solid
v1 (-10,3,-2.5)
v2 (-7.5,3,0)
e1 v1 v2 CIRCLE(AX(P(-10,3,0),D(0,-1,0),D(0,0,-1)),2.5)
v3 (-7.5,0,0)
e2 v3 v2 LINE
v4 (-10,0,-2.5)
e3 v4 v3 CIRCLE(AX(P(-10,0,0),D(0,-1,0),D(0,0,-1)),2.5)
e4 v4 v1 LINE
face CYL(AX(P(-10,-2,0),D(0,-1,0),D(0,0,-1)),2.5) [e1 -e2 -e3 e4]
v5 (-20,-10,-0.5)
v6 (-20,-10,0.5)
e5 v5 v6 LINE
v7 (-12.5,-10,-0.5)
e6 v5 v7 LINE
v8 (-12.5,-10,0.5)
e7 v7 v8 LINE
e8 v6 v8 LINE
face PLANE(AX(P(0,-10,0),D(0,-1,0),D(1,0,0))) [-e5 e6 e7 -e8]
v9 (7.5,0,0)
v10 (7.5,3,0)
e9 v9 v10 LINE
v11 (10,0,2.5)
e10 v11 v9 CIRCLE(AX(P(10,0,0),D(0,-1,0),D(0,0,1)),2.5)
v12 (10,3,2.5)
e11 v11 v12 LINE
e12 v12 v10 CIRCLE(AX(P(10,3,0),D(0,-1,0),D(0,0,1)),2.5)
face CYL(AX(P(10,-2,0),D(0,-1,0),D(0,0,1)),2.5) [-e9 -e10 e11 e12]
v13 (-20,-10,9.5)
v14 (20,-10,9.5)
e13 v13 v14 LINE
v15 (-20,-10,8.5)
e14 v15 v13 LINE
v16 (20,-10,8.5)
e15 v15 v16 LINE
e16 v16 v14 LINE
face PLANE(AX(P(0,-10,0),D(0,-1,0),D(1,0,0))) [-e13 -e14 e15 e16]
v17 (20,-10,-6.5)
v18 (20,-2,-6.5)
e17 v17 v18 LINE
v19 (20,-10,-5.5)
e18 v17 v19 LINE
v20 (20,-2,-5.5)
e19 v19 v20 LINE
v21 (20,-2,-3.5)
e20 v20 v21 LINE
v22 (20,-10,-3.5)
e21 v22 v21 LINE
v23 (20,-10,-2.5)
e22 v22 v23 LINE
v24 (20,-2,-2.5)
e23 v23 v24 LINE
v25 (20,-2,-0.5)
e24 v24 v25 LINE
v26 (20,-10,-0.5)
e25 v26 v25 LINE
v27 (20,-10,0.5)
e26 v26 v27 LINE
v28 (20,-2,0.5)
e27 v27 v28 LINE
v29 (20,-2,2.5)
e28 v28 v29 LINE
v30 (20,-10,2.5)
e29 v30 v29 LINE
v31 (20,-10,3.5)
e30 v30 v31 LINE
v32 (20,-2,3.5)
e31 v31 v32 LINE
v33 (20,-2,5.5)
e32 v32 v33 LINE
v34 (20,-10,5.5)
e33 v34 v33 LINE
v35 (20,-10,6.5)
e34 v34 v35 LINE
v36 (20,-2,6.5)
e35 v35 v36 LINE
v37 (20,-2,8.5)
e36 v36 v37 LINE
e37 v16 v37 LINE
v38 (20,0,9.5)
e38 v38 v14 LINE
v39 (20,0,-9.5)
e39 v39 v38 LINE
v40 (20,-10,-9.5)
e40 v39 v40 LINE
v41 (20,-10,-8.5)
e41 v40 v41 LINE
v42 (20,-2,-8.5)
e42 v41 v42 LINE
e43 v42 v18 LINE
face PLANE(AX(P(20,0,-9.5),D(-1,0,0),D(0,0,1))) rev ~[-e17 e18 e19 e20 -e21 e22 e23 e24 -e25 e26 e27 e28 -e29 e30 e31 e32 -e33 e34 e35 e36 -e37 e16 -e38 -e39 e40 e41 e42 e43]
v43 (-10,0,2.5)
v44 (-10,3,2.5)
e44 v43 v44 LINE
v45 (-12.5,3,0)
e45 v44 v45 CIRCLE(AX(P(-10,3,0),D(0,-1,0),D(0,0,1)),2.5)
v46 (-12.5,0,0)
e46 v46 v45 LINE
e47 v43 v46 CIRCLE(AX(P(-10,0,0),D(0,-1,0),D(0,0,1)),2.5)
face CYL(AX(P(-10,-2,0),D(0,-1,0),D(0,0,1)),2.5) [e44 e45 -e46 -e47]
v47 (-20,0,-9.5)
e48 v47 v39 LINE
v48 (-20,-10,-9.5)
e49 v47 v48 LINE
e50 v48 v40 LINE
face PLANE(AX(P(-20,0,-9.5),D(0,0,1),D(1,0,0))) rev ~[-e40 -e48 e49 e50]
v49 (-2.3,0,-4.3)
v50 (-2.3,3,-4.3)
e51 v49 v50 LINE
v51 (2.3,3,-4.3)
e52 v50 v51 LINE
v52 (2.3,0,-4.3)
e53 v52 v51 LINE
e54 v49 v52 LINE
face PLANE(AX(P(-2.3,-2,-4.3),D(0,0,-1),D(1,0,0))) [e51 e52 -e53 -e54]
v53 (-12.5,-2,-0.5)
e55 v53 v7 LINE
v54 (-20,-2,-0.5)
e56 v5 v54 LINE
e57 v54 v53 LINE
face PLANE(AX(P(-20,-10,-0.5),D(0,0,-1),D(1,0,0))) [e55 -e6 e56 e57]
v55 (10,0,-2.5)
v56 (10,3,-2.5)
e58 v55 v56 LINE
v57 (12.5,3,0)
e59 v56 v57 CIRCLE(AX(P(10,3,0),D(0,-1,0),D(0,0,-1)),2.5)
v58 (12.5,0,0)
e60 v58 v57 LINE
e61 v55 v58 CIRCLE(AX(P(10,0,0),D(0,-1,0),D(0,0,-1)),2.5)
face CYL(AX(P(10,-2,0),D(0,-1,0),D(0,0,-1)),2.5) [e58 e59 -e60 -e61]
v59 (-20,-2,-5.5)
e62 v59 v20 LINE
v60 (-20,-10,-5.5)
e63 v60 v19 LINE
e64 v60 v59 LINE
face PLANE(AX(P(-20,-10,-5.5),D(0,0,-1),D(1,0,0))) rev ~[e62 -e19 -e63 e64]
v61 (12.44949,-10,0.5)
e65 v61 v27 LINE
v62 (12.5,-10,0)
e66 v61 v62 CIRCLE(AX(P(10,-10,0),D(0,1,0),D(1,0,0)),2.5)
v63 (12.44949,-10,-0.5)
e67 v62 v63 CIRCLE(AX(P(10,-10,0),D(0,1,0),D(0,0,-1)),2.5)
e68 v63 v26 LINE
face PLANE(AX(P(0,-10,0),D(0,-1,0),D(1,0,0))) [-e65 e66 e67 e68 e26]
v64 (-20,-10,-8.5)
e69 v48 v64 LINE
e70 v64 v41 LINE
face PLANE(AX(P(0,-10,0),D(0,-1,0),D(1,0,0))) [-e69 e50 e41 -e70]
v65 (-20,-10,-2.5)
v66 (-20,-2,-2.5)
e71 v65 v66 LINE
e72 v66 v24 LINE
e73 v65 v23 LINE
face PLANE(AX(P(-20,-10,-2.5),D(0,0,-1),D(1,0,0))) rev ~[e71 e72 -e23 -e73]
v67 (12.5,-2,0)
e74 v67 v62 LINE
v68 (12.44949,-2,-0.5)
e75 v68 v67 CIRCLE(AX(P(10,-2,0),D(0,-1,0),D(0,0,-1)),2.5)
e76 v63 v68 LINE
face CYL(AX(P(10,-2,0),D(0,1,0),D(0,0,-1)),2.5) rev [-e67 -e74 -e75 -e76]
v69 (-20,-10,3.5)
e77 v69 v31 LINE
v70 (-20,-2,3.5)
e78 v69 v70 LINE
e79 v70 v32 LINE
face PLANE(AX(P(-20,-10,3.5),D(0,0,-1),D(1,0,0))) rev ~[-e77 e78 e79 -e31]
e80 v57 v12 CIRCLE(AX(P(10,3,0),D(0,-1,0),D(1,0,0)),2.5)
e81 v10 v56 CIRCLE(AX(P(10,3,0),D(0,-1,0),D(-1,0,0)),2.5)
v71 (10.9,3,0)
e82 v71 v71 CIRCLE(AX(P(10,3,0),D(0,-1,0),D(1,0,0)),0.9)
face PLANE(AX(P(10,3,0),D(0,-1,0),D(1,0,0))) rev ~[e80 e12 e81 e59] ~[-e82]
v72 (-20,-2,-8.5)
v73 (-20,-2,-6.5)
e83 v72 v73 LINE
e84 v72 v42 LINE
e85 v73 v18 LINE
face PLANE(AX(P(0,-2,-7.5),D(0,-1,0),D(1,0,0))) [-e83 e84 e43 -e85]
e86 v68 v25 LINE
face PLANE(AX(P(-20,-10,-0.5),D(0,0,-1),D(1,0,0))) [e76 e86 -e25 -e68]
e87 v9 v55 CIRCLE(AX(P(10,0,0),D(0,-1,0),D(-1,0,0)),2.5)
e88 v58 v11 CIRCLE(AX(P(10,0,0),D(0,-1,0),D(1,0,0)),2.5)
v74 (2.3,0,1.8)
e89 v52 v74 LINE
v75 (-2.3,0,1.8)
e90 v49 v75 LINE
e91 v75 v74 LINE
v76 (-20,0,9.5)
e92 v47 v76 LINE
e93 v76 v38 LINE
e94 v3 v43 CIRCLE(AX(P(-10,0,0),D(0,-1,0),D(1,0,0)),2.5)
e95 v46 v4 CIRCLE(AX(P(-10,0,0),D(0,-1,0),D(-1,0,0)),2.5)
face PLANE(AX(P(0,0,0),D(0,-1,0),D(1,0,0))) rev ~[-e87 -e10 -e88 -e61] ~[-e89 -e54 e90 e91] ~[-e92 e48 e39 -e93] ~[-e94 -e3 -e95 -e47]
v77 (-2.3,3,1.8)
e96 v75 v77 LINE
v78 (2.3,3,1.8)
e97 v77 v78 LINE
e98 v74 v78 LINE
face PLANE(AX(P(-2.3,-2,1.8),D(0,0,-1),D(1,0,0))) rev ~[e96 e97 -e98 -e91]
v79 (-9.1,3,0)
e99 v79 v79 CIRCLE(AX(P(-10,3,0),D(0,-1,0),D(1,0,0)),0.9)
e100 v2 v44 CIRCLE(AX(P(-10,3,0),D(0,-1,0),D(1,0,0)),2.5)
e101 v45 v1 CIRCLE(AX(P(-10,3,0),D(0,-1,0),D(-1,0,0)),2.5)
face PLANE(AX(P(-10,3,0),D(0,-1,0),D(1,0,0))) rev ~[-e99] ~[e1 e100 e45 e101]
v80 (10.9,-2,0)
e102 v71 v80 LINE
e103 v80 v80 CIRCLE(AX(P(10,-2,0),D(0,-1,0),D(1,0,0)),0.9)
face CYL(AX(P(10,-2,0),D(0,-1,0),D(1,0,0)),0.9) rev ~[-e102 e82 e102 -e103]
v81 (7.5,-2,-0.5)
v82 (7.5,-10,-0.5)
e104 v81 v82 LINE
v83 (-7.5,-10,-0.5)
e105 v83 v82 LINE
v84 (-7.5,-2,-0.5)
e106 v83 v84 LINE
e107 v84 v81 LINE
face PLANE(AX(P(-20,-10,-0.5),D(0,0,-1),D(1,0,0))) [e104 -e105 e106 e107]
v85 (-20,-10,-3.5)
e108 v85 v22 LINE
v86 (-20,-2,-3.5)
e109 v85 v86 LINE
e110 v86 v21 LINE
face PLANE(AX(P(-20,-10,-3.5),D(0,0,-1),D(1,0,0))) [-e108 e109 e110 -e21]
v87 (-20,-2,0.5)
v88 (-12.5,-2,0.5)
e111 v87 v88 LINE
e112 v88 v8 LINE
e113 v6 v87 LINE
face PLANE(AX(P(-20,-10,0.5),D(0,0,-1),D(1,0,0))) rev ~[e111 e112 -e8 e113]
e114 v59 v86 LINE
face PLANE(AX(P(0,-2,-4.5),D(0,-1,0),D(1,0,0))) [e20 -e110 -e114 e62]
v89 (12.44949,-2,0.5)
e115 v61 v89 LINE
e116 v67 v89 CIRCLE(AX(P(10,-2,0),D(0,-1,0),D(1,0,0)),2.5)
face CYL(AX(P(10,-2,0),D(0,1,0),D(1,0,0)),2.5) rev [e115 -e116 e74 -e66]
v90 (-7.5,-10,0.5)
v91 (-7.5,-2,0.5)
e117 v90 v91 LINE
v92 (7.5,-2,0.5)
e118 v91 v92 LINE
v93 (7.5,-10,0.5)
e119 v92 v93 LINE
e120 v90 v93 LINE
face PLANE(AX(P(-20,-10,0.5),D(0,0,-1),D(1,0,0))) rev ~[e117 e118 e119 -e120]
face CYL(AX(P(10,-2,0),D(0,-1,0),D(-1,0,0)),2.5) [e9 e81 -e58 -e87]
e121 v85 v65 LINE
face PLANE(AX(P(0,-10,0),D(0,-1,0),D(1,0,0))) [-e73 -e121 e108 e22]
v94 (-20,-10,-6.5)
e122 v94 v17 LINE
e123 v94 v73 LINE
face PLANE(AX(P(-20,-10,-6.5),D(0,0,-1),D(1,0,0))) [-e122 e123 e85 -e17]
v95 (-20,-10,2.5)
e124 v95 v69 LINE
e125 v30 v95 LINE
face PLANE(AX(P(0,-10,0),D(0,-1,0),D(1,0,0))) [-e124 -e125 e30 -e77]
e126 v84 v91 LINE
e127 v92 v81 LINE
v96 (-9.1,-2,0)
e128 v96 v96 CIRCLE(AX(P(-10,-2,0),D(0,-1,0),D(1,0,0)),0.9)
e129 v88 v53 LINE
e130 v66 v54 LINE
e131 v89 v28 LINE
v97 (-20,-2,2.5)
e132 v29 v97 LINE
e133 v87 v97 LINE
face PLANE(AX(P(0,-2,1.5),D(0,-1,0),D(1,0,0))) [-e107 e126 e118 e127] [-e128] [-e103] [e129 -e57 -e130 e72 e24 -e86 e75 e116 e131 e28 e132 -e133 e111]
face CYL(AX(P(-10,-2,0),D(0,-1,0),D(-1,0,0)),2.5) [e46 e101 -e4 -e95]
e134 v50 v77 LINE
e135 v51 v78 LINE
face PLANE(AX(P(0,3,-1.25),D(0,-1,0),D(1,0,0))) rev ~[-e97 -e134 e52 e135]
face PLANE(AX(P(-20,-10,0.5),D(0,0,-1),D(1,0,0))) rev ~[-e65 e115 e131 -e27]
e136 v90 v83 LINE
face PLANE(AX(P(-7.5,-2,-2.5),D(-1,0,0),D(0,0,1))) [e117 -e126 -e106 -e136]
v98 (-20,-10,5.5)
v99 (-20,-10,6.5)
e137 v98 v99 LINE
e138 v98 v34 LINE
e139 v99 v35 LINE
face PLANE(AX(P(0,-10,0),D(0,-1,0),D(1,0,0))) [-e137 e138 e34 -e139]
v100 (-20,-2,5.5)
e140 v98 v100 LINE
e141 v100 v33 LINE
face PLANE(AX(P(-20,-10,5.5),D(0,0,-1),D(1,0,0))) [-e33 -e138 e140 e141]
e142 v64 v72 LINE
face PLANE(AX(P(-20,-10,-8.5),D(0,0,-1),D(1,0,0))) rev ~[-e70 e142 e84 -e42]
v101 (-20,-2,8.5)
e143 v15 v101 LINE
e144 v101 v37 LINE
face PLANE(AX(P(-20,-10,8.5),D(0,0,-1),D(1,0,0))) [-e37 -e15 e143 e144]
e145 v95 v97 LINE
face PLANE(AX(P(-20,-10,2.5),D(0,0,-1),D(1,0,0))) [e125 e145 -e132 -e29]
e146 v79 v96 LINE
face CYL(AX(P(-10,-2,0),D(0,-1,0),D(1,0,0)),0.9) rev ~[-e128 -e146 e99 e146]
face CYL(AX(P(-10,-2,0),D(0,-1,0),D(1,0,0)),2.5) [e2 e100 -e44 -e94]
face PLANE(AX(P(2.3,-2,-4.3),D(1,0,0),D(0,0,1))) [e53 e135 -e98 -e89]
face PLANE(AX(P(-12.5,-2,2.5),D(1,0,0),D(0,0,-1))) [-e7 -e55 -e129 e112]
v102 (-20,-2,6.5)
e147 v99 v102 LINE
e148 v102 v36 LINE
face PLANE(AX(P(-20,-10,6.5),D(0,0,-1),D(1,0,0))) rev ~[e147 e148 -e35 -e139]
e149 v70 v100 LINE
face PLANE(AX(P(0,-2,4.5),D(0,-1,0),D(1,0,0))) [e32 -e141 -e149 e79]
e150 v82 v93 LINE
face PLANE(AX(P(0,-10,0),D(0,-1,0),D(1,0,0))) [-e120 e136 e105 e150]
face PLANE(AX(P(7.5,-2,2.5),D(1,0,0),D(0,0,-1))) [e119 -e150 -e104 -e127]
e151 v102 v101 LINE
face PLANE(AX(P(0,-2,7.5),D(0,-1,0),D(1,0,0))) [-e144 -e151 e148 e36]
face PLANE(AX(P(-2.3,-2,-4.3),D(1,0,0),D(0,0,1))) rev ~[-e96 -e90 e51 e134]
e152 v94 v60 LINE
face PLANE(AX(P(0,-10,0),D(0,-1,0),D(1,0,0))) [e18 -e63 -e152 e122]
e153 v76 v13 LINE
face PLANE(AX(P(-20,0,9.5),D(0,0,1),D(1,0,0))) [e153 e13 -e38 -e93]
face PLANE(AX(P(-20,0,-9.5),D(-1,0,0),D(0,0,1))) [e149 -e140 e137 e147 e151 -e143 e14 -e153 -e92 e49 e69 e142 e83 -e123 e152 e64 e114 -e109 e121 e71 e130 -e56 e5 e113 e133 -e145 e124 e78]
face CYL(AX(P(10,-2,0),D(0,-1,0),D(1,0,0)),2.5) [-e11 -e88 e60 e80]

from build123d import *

# Parameters (mm, degrees)
F0_W     = 40
F0_H     = 19
F1_DEPTH = 10
F2_W     = 40
F2_H     = 2
F4_DEPTH = 8
F5_R     = 0.9
F5_W     = 4.6
F5_H     = 6.1
F7_DEPTH = 5
F8_DEPTH = 8.001
F9_DEPTH = 5.001


# Not quite as in the source:
# - a feature names something its author has since deleted; it is built from what else it names


with BuildPart() as f1:
    # F0 (on Front) → F1 (new body)
    with BuildSketch(Plane.XZ):
        Rectangle(F0_W, F0_H)
    extrude(amount=F1_DEPTH)

    # F2 (on face) → F4 (cut, through all)
    with BuildSketch(Plane.XZ.offset(10)):
        with Locations((0, 7.5)):
            Rectangle(F2_W, F2_H)
        with Locations((0, 4.5)):
            Rectangle(F2_W, F2_H)
        with Locations((0, 1.5)):
            Rectangle(F2_W, F2_H)
        with Locations((0, -1.5)):
            Rectangle(F2_W, F2_H)
        with Locations((0, -4.5)):
            Rectangle(F2_W, F2_H)
        with Locations((0, -7.5)):
            Rectangle(F2_W, F2_H)
    extrude(amount=-F4_DEPTH, mode=Mode.SUBTRACT)

    # F5 (on offset) → F7 (join, through all)
    with BuildSketch(Plane.XZ.offset(2)):
        with BuildLine():
            ThreePointArc((10, 2.5), (8.232233047, 1.767766953), (7.5, 0))
            ThreePointArc((7.5, 0), (8.232233047, -1.767766953), (10, -2.5))
            ThreePointArc((10, -2.5), (11.767766953, -1.767766953), (12.5, 0))
            ThreePointArc((12.5, 0), (11.767766953, 1.767766953), (10, 2.5))
        make_face()
        with Locations((10, 0)):
            Circle(F5_R, mode=Mode.SUBTRACT)
        with BuildLine():
            ThreePointArc((-10, -2.5), (-8.232233047, -1.767766953), (-7.5, 0))
            ThreePointArc((-7.5, 0), (-8.232233047, 1.767766953), (-10, 2.5))
            ThreePointArc((-10, 2.5), (-11.767766953, 1.767766953), (-12.5, 0))
            ThreePointArc((-12.5, 0), (-11.767766953, -1.767766953), (-10, -2.5))
        make_face()
        with Locations((-10, 0)):
            Circle(F5_R, mode=Mode.SUBTRACT)
        with Locations((0, -1.25)):
            Rectangle(F5_W, F5_H)
    extrude(amount=-F7_DEPTH)

    # F5 (on offset) → F8 (cut, through all)
    with BuildSketch(Plane.XZ.offset(2)):
        with BuildLine():
            ThreePointArc((-10, 2.5), (-8.232233047, 1.767766953), (-7.5, 0))
            Line((-7.5, 0), (-7.5, 2.5))
            Line((-7.5, 2.5), (-10, 2.5))
        make_face()
        with BuildLine():
            ThreePointArc((-12.5, 0), (-11.767766953, 1.767766953), (-10, 2.5))
            Line((-10, 2.5), (-12.5, 2.5))
            Line((-12.5, 2.5), (-12.5, 0))
        make_face()
        with BuildLine():
            Line((-12.5, -2.5), (-10, -2.5))
            ThreePointArc((-10, -2.5), (-11.767766953, -1.767766953), (-12.5, 0))
            Line((-12.5, 0), (-12.5, -2.5))
        make_face()
        with BuildLine():
            Line((-7.5, -2.5), (-7.5, 0))
            ThreePointArc((-7.5, 0), (-8.232233047, -1.767766953), (-10, -2.5))
            Line((-10, -2.5), (-7.5, -2.5))
        make_face()
        with BuildLine():
            ThreePointArc((-10, -2.5), (-8.232233047, -1.767766953), (-7.5, 0))
            ThreePointArc((-7.5, 0), (-8.232233047, 1.767766953), (-10, 2.5))
            ThreePointArc((-10, 2.5), (-11.767766953, 1.767766953), (-12.5, 0))
            ThreePointArc((-12.5, 0), (-11.767766953, -1.767766953), (-10, -2.5))
        make_face()
        with Locations((-10, 0)):
            Circle(F5_R, mode=Mode.SUBTRACT)
        with Locations((-10, 0)):
            Circle(F5_R)
        with BuildLine():
            Line((10, 2.5), (7.5, 2.5))
            Line((7.5, 2.5), (7.5, 0))
            ThreePointArc((7.5, 0), (8.232233047, 1.767766953), (10, 2.5))
        make_face()
        with BuildLine():
            ThreePointArc((10, -2.5), (8.232233047, -1.767766953), (7.5, 0))
            Line((7.5, 0), (7.5, -2.5))
            Line((7.5, -2.5), (10, -2.5))
        make_face()
        with BuildLine():
            ThreePointArc((10, 2.5), (8.232233047, 1.767766953), (7.5, 0))
            ThreePointArc((7.5, 0), (8.232233047, -1.767766953), (10, -2.5))
            ThreePointArc((10, -2.5), (11.767766953, -1.767766953), (12.5, 0))
            ThreePointArc((12.5, 0), (11.767766953, 1.767766953), (10, 2.5))
        make_face()
        with Locations((10, 0)):
            Circle(F5_R, mode=Mode.SUBTRACT)
        with Locations((10, 0)):
            Circle(F5_R)
    extrude(amount=F8_DEPTH, mode=Mode.SUBTRACT)

    # F5 (on offset) → F9 (cut, through all)
    with BuildSketch(Plane.XZ.offset(2)):
        with Locations((10, 0)):
            Circle(F5_R)
        with Locations((-10, 0)):
            Circle(F5_R)
    extrude(amount=-F9_DEPTH, mode=Mode.SUBTRACT)


solid = f1.part
